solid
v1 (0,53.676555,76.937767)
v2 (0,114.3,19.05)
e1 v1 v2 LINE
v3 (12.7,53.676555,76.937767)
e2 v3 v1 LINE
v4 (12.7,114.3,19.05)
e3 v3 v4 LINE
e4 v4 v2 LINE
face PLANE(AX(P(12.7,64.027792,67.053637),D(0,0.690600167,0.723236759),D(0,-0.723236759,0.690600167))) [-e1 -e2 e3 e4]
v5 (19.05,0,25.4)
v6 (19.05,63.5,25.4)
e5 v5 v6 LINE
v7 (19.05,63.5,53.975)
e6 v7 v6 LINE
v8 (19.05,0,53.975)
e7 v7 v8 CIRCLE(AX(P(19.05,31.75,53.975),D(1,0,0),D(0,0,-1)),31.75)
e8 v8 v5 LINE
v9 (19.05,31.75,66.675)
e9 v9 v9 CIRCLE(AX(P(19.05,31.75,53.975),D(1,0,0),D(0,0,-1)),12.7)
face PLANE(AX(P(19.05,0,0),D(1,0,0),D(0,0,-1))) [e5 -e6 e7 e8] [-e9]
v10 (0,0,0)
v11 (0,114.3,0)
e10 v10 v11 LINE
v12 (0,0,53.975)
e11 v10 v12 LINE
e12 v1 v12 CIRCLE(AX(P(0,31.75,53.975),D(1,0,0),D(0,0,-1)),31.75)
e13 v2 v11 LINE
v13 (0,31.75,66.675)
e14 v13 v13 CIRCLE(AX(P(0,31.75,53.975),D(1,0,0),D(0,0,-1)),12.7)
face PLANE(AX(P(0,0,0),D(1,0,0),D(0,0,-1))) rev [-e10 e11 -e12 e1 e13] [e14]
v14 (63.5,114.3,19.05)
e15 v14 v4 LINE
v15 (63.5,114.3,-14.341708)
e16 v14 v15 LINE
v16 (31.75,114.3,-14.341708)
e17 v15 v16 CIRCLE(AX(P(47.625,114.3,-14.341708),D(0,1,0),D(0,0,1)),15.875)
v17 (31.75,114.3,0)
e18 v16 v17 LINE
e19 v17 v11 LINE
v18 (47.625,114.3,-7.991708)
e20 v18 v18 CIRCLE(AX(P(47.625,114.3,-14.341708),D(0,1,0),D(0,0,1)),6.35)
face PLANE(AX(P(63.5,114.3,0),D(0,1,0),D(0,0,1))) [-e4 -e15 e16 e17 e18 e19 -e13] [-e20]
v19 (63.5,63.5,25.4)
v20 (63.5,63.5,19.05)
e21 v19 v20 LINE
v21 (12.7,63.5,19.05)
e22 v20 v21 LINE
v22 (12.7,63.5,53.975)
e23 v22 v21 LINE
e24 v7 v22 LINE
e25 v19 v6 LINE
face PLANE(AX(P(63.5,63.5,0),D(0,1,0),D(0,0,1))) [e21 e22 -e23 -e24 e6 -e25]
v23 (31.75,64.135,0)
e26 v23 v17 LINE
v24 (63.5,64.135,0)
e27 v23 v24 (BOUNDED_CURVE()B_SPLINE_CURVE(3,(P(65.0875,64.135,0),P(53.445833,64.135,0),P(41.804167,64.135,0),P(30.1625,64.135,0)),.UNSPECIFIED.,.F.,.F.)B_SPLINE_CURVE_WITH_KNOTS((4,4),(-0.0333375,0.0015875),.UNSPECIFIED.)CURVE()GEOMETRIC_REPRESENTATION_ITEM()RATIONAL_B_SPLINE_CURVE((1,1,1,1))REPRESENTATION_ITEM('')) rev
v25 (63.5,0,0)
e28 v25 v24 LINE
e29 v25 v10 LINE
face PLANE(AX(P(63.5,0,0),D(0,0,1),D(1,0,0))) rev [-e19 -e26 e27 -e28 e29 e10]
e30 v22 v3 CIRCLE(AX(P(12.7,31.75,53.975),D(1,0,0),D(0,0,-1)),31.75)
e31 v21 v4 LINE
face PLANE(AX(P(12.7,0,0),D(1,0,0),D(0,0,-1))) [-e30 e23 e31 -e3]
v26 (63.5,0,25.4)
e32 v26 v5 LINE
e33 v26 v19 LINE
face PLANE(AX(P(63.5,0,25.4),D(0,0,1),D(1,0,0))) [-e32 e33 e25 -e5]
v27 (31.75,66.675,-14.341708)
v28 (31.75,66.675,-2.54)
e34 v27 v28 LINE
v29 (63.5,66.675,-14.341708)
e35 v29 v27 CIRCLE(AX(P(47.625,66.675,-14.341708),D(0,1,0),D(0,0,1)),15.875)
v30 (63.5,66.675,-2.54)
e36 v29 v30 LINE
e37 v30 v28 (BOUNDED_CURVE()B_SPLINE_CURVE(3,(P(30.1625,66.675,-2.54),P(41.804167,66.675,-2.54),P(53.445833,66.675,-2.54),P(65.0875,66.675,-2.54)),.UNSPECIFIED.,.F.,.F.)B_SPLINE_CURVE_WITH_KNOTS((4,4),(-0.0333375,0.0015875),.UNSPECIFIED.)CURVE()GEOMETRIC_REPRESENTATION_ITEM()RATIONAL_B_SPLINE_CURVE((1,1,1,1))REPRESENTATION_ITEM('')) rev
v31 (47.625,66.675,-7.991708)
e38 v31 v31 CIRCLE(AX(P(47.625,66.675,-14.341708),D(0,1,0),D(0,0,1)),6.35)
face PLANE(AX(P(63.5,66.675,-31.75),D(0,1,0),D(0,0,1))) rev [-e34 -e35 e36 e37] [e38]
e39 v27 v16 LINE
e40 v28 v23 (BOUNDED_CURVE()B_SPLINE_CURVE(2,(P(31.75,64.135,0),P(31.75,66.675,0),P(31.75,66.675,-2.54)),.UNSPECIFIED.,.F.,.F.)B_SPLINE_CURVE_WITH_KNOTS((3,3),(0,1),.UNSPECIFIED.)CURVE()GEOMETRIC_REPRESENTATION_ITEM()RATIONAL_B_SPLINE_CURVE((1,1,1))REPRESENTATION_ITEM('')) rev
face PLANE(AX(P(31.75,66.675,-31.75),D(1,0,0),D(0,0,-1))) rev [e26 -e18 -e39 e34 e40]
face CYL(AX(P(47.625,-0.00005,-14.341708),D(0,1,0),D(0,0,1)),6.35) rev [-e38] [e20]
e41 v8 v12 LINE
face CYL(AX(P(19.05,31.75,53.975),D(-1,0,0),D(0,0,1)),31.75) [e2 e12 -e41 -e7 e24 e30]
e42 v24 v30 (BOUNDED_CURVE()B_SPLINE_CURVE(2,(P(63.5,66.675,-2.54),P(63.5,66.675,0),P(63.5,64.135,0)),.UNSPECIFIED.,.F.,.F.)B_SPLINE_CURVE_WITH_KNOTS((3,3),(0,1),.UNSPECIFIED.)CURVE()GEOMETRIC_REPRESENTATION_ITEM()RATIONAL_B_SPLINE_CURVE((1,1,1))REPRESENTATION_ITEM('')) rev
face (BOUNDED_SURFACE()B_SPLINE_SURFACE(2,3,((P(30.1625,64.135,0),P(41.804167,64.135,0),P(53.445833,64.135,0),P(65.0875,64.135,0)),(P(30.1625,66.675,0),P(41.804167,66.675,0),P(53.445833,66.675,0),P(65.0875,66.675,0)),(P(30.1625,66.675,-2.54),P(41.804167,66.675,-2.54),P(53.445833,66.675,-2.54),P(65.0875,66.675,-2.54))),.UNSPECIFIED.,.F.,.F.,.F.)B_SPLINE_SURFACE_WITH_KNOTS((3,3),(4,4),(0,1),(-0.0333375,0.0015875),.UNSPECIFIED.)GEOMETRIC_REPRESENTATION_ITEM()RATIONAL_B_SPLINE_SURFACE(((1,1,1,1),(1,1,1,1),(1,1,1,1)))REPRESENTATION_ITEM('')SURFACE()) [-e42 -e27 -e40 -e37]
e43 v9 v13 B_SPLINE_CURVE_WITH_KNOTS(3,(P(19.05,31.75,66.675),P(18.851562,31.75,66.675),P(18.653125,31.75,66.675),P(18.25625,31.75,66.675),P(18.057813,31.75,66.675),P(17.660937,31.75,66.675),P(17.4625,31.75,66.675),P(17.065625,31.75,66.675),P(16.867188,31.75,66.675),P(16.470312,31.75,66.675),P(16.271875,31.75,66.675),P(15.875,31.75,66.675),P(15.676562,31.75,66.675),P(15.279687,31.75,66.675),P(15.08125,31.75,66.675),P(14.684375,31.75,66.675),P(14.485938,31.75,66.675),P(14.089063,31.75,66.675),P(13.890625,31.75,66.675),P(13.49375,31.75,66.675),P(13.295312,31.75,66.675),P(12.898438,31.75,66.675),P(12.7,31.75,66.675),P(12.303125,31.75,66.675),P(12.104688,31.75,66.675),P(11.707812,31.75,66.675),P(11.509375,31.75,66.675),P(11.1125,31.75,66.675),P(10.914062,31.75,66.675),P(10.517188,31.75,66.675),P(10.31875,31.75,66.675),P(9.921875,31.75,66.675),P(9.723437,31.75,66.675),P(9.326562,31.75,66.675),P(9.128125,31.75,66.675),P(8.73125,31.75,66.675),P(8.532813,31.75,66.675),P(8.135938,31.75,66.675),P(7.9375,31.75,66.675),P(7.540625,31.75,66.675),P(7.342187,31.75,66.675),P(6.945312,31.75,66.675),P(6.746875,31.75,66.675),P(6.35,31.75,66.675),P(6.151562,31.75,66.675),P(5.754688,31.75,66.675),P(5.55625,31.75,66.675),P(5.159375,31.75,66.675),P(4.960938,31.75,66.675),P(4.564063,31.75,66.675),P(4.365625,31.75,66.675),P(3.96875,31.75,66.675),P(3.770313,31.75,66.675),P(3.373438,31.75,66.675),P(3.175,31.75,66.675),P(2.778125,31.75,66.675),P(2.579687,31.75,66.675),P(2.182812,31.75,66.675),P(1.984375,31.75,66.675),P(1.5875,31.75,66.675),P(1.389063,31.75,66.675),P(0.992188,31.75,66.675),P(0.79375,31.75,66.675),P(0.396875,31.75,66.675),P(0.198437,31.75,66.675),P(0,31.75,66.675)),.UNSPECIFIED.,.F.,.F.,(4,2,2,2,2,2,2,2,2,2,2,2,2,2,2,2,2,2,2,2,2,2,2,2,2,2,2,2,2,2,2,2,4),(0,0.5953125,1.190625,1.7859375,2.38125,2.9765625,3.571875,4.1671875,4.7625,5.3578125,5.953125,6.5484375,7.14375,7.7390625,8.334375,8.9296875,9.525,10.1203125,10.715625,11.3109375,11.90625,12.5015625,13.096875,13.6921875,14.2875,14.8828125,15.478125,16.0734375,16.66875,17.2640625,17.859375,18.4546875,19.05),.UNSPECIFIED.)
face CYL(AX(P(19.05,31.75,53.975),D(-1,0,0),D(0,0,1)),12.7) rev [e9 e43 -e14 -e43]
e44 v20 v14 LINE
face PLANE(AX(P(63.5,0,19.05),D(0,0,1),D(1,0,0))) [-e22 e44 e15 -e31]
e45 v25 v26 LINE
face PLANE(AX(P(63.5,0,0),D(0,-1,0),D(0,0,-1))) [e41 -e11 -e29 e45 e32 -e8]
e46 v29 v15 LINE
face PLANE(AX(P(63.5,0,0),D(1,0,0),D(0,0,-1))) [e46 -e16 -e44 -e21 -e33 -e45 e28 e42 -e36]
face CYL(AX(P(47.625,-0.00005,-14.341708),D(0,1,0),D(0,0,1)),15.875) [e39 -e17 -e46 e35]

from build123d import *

# Parameters (mm, degrees)
BOSS_EXTRUDE1_DEPTH = 63.5
SKETCH1_3_R         = 12.7
BOSS_EXTRUDE2_DEPTH = 19.05
BOSS_EXTRUDE3_DEPTH = 12.7
SKETCH2_W           = 31.75
SKETCH2_H           = 47.625
BOSS_EXTRUDE4_DEPTH = 31.75
SKETCH3_R           = 6.35
CUT_EXTRUDE1_DEPTH  = 157.350617604
FILLET1_SIZE        = 2.54


with BuildPart() as part:
    # Sketch1 → Boss-Extrude1 (new body)
    with BuildSketch(Plane(origin=(0, 0, 0), x_dir=(0, 0, -1), z_dir=(1, 0, 0))):
        Polygon((0, 0), (0, 114.3), (-19.05, 114.3), (-19.05, 63.5), (-25.4, 63.5), (-25.4, 0), align=None)
    extrude(amount=BOSS_EXTRUDE1_DEPTH)

    # Sketch1<3> → Boss-Extrude2 (add)
    with BuildSketch(Plane(origin=(0, 0, 0), x_dir=(0, 0, -1), z_dir=(1, 0, 0))):
        with BuildLine():
            Line((-53.975, 63.5), (-25.4, 63.5))
            Line((-25.4, 63.5), (-25.4, 0))
            Line((-25.4, 0), (-53.975, 0))
            ThreePointArc((-53.975, 0), (-85.725, 31.75), (-53.975, 63.5))
        make_face()
        with Locations(Location((-53.975, 31.75, 0), (0, 0, 180))):
            Circle(SKETCH1_3_R, mode=Mode.SUBTRACT)
    extrude(amount=BOSS_EXTRUDE2_DEPTH)

    # Sketch1<4> → Boss-Extrude3 (add)
    with BuildSketch(Plane(origin=(0, 0, 0), x_dir=(0, 0, -1), z_dir=(1, 0, 0))):
        with BuildLine():
            Line((-53.975, 63.5), (-25.4, 63.5))
            Line((-25.4, 63.5), (-19.05, 63.5))
            Line((-19.05, 63.5), (-19.05, 114.3))
            Line((-19.05, 114.3), (-76.937767089, 53.676555307))
            ThreePointArc((-76.937767089, 53.676555307), (-66.462881506, 60.941014294), (-53.975, 63.5))
        make_face()
    extrude(amount=BOSS_EXTRUDE3_DEPTH)

    # Sketch2 → Boss-Extrude4 (add)
    with BuildSketch(Plane(origin=(0, 0, 0), x_dir=(-1, 0, 0), z_dir=(0, 0, -1))):
        with Locations((-47.625, 90.4875)):
            Rectangle(SKETCH2_W, SKETCH2_H)
    extrude(amount=BOSS_EXTRUDE4_DEPTH)

    # Sketch3 → Cut-Extrude1 (cut, through all)
    with BuildSketch(Plane(origin=(0, 114.3, 0), x_dir=(1, 0, 0), z_dir=(0, 1, 0))):
        with BuildLine():
            Line((31.75, 31.75), (31.75, 14.341708261))
            ThreePointArc((31.75, 14.341708261), (47.625, 30.216708261), (63.5, 14.341708261))
            Line((63.5, 14.341708261), (63.5, 31.75))
            Line((63.5, 31.75), (31.75, 31.75))
        make_face()
        with Locations(Location((47.625, 14.341708261, 0), (0, 0, 270))):
            Circle(SKETCH3_R)
    extrude(amount=-CUT_EXTRUDE1_DEPTH, mode=Mode.SUBTRACT)

    # Fillet1
    # a fillet whose section is not a circle: 2.54 mm, written as the material it adds along each edge
    with BuildSketch(Plane(origin=(63.5, 66.675, 0), x_dir=(0, -1, 0), z_dir=(-1, 0, 0))) as fillet1_piece_1:
        with BuildLine():
            Bezier((FILLET1_SIZE, 0), (0, 0), (0, -FILLET1_SIZE), weights=[1, 1, 1])
            Line((0, -FILLET1_SIZE), (0, 0))
            Line((0, 0), (FILLET1_SIZE, 0))
        make_face()
    extrude(amount=31.75)


solid = part.part
